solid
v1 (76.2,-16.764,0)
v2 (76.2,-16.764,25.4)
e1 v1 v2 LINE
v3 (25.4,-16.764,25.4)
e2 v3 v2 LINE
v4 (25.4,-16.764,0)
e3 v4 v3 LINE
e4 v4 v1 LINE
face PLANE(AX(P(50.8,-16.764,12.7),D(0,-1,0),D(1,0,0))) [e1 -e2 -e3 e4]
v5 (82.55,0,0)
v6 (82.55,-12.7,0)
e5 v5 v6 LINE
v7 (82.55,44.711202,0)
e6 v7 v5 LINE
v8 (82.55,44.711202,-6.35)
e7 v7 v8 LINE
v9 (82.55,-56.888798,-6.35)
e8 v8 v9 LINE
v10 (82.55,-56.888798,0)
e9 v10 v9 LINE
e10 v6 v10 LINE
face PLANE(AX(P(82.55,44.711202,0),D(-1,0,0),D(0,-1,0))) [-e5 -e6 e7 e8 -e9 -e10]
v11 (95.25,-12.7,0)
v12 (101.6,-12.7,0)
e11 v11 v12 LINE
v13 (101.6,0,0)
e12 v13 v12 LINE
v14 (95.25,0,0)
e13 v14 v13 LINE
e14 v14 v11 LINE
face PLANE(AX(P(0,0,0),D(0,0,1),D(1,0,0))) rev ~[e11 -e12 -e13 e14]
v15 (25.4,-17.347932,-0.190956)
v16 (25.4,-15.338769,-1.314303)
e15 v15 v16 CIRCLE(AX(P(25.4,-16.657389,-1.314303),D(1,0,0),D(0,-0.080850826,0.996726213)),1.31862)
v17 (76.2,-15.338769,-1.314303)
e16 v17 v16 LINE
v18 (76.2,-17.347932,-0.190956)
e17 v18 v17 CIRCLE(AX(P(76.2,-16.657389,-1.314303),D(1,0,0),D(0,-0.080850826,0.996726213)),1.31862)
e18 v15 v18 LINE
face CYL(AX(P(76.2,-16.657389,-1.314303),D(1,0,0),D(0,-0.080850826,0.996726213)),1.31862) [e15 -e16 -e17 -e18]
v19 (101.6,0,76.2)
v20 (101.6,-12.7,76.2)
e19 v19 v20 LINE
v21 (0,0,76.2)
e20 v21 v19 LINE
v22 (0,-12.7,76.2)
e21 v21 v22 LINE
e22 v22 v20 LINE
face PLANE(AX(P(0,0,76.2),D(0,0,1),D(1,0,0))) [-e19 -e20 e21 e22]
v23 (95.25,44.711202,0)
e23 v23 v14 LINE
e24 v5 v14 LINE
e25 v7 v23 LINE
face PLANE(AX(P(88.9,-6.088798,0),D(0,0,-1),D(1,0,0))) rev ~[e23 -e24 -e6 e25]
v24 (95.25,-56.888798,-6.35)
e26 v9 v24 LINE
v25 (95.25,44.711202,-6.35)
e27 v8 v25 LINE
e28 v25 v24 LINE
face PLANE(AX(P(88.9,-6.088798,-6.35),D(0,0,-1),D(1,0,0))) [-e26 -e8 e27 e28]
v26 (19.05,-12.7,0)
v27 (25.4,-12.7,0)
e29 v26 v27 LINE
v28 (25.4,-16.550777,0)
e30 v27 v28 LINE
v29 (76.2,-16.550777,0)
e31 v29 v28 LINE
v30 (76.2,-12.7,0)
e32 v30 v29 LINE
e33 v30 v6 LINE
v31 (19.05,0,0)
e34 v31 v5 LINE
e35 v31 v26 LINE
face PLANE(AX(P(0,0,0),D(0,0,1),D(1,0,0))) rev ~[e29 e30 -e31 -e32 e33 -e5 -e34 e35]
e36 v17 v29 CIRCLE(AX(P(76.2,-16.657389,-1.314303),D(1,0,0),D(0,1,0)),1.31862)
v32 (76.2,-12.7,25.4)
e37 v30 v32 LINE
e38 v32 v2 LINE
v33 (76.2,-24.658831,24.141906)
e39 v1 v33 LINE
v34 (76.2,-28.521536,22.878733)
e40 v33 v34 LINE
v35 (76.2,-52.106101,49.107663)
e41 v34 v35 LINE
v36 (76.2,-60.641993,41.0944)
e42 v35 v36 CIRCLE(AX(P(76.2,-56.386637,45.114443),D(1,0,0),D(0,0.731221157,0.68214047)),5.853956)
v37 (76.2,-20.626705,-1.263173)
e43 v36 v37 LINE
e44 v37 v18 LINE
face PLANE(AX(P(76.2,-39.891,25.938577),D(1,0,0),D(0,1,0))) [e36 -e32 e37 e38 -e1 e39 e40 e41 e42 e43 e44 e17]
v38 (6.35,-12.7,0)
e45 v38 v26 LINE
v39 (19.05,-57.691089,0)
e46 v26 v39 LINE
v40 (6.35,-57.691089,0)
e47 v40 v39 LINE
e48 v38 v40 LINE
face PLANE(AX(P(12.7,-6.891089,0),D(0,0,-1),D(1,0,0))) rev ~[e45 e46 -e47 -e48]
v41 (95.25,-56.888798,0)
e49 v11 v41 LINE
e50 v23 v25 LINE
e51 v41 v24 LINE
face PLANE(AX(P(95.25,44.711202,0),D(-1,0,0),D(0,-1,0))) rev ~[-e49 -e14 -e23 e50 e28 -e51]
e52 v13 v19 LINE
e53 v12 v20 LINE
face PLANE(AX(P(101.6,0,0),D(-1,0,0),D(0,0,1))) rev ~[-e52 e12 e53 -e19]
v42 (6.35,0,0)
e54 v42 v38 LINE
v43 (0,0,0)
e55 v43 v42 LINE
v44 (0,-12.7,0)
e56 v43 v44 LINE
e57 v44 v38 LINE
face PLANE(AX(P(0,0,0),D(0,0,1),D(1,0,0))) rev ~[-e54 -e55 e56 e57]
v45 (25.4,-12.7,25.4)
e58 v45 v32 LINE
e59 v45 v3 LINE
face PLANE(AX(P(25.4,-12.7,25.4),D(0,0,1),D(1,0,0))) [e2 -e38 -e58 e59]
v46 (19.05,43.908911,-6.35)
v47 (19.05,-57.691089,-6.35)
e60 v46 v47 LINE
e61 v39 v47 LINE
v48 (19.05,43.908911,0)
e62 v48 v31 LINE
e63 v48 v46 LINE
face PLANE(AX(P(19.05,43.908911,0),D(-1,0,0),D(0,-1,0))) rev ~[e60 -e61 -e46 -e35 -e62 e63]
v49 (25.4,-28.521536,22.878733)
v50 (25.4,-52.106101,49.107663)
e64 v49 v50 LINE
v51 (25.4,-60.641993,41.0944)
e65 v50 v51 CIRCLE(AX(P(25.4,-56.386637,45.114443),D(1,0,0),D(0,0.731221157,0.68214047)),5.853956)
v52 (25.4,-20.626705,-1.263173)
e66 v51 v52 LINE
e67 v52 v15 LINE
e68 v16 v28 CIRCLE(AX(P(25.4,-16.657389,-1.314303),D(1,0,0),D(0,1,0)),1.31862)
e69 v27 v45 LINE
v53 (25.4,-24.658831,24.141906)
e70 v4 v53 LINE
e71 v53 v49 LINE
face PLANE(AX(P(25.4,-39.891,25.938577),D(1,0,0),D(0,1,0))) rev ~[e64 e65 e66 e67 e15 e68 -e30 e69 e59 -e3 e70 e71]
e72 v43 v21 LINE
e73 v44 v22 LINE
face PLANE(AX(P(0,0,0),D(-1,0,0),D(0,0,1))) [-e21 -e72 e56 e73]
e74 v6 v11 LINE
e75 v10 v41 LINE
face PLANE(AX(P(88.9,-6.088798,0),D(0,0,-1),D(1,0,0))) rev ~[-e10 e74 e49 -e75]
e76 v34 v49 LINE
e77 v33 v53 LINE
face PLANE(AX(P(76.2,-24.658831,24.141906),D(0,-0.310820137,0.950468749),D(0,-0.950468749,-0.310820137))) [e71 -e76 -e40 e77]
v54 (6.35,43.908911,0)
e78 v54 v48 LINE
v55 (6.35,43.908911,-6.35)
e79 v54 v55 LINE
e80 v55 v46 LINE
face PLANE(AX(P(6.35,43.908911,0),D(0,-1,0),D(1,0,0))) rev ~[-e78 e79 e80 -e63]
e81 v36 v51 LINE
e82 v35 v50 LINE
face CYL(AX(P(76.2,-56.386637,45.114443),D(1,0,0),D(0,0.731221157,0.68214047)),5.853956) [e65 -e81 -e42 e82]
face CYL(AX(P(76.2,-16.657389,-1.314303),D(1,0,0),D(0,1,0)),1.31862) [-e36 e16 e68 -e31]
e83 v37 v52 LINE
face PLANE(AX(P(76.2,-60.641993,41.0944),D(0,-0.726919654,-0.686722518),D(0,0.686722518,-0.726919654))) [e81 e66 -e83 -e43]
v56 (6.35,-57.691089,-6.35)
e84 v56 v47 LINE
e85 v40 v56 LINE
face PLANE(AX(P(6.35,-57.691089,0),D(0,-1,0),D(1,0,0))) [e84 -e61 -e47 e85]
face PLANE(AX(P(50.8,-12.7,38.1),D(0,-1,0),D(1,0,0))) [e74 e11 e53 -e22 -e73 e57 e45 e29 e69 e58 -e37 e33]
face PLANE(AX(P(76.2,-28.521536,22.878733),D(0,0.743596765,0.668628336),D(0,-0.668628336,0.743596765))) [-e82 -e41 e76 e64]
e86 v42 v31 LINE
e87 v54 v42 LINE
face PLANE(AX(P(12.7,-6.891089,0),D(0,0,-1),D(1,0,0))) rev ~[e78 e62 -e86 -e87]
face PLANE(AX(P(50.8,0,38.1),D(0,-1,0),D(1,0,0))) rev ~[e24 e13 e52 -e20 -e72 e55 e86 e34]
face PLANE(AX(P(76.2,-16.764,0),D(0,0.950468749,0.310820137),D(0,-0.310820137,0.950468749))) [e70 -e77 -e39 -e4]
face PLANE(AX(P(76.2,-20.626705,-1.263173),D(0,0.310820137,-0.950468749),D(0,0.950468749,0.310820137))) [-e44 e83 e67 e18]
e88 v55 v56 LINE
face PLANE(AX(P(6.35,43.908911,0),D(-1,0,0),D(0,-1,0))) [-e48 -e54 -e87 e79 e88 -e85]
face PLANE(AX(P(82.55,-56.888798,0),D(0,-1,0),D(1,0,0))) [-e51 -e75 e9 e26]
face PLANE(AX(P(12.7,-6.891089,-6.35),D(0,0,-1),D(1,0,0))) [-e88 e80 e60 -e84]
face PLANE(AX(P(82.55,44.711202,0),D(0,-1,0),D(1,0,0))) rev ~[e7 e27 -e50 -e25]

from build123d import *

# Parameters (mm, degrees)
F0_W      = 101.6
F0_H      = 76.2
F1_DEPTH  = 12.7
F2_W      = 50.8
F2_H      = 25.4
F3_DEPTH  = 4.064
F5_DEPTH  = 50.8
F7_DEPTH  = 50.8
F9_DEPTH  = 50.8
F10_W     = 12.7
F10_H     = 101.6
F11_DEPTH = 6.35
F12_W     = 12.7
F12_H     = 101.6
F13_DEPTH = 6.35


with BuildPart() as f1:
    # F0 (on Front) → F1 (new body)
    with BuildSketch(Plane.XZ):
        with Locations((50.8, 38.1)):
            Rectangle(F0_W, F0_H)
    extrude(amount=F1_DEPTH)

    # F2 (on face) → F3 (join)
    with BuildSketch(Plane.XZ.offset(12.7)):
        with Locations((50.8, 12.7)):
            Rectangle(F2_W, F2_H)
    extrude(amount=F3_DEPTH)

    # F4 (on face) → F5 (join)
    with BuildSketch(Plane.YZ.offset(76.2)):
        Polygon((-20.6267049946, -1.2631730384), (-16.764, 0), (-24.6588314903, 24.1419062159), (-28.5215364849, 22.8787331775), align=None)
    extrude(amount=-F5_DEPTH)

    # F6 (on face) → F7 (join)
    with BuildSketch(Plane.YZ.offset(76.2)):
        with BuildLine():
            Line((-16.5507770221, 0), (-16.764, 0))
            ThreePointArc((-16.764, 0), (-17.5513062441, -2.2836680049), (-15.3387688414, -1.31430279))
            ThreePointArc((-15.3387688414, -1.31430279), (-15.6880232962, -0.4203850569), (-16.5507770221, 0))
        make_face()
        with BuildLine():
            ThreePointArc((-16.5507770221, 0), (-16.6573885111, 0.0043168797), (-16.764, 0))
            Line((-16.764, 0), (-16.5507770221, 0))
        make_face()
    extrude(amount=-F7_DEPTH)

    # F8 (on face) → F9 (join)
    with BuildSketch(Plane.YZ.offset(76.2)):
        with BuildLine():
            Line((-20.6267049946, -1.2631730384), (-28.5215364849, 22.8787331775))
            Line((-28.5215364849, 22.8787331775), (-52.1061010659, 49.1076633334))
            ThreePointArc((-52.1061010659, 49.1076633334), (-60.3932888084, 49.3824101727), (-60.6419928372, 41.0943999887))
            Line((-60.6419928372, 41.0943999887), (-20.6267049946, -1.2631730384))
        make_face()
    extrude(amount=-F9_DEPTH)

    # F10 (on face) → F11 (join)
    with BuildSketch(Plane(origin=(0, 0, 0), x_dir=(1, 0, 0), z_dir=(0, 0, -1))):
        with Locations((88.9, 6.0887979344)):
            Rectangle(F10_W, F10_H)
    extrude(amount=F11_DEPTH)

    # F12 (on face) → F13 (join)
    with BuildSketch(Plane(origin=(0, 0, 0), x_dir=(1, 0, 0), z_dir=(0, 0, -1))):
        with Locations((12.7, 6.8910890259)):
            Rectangle(F12_W, F12_H)
    extrude(amount=F13_DEPTH)


solid = f1.part
